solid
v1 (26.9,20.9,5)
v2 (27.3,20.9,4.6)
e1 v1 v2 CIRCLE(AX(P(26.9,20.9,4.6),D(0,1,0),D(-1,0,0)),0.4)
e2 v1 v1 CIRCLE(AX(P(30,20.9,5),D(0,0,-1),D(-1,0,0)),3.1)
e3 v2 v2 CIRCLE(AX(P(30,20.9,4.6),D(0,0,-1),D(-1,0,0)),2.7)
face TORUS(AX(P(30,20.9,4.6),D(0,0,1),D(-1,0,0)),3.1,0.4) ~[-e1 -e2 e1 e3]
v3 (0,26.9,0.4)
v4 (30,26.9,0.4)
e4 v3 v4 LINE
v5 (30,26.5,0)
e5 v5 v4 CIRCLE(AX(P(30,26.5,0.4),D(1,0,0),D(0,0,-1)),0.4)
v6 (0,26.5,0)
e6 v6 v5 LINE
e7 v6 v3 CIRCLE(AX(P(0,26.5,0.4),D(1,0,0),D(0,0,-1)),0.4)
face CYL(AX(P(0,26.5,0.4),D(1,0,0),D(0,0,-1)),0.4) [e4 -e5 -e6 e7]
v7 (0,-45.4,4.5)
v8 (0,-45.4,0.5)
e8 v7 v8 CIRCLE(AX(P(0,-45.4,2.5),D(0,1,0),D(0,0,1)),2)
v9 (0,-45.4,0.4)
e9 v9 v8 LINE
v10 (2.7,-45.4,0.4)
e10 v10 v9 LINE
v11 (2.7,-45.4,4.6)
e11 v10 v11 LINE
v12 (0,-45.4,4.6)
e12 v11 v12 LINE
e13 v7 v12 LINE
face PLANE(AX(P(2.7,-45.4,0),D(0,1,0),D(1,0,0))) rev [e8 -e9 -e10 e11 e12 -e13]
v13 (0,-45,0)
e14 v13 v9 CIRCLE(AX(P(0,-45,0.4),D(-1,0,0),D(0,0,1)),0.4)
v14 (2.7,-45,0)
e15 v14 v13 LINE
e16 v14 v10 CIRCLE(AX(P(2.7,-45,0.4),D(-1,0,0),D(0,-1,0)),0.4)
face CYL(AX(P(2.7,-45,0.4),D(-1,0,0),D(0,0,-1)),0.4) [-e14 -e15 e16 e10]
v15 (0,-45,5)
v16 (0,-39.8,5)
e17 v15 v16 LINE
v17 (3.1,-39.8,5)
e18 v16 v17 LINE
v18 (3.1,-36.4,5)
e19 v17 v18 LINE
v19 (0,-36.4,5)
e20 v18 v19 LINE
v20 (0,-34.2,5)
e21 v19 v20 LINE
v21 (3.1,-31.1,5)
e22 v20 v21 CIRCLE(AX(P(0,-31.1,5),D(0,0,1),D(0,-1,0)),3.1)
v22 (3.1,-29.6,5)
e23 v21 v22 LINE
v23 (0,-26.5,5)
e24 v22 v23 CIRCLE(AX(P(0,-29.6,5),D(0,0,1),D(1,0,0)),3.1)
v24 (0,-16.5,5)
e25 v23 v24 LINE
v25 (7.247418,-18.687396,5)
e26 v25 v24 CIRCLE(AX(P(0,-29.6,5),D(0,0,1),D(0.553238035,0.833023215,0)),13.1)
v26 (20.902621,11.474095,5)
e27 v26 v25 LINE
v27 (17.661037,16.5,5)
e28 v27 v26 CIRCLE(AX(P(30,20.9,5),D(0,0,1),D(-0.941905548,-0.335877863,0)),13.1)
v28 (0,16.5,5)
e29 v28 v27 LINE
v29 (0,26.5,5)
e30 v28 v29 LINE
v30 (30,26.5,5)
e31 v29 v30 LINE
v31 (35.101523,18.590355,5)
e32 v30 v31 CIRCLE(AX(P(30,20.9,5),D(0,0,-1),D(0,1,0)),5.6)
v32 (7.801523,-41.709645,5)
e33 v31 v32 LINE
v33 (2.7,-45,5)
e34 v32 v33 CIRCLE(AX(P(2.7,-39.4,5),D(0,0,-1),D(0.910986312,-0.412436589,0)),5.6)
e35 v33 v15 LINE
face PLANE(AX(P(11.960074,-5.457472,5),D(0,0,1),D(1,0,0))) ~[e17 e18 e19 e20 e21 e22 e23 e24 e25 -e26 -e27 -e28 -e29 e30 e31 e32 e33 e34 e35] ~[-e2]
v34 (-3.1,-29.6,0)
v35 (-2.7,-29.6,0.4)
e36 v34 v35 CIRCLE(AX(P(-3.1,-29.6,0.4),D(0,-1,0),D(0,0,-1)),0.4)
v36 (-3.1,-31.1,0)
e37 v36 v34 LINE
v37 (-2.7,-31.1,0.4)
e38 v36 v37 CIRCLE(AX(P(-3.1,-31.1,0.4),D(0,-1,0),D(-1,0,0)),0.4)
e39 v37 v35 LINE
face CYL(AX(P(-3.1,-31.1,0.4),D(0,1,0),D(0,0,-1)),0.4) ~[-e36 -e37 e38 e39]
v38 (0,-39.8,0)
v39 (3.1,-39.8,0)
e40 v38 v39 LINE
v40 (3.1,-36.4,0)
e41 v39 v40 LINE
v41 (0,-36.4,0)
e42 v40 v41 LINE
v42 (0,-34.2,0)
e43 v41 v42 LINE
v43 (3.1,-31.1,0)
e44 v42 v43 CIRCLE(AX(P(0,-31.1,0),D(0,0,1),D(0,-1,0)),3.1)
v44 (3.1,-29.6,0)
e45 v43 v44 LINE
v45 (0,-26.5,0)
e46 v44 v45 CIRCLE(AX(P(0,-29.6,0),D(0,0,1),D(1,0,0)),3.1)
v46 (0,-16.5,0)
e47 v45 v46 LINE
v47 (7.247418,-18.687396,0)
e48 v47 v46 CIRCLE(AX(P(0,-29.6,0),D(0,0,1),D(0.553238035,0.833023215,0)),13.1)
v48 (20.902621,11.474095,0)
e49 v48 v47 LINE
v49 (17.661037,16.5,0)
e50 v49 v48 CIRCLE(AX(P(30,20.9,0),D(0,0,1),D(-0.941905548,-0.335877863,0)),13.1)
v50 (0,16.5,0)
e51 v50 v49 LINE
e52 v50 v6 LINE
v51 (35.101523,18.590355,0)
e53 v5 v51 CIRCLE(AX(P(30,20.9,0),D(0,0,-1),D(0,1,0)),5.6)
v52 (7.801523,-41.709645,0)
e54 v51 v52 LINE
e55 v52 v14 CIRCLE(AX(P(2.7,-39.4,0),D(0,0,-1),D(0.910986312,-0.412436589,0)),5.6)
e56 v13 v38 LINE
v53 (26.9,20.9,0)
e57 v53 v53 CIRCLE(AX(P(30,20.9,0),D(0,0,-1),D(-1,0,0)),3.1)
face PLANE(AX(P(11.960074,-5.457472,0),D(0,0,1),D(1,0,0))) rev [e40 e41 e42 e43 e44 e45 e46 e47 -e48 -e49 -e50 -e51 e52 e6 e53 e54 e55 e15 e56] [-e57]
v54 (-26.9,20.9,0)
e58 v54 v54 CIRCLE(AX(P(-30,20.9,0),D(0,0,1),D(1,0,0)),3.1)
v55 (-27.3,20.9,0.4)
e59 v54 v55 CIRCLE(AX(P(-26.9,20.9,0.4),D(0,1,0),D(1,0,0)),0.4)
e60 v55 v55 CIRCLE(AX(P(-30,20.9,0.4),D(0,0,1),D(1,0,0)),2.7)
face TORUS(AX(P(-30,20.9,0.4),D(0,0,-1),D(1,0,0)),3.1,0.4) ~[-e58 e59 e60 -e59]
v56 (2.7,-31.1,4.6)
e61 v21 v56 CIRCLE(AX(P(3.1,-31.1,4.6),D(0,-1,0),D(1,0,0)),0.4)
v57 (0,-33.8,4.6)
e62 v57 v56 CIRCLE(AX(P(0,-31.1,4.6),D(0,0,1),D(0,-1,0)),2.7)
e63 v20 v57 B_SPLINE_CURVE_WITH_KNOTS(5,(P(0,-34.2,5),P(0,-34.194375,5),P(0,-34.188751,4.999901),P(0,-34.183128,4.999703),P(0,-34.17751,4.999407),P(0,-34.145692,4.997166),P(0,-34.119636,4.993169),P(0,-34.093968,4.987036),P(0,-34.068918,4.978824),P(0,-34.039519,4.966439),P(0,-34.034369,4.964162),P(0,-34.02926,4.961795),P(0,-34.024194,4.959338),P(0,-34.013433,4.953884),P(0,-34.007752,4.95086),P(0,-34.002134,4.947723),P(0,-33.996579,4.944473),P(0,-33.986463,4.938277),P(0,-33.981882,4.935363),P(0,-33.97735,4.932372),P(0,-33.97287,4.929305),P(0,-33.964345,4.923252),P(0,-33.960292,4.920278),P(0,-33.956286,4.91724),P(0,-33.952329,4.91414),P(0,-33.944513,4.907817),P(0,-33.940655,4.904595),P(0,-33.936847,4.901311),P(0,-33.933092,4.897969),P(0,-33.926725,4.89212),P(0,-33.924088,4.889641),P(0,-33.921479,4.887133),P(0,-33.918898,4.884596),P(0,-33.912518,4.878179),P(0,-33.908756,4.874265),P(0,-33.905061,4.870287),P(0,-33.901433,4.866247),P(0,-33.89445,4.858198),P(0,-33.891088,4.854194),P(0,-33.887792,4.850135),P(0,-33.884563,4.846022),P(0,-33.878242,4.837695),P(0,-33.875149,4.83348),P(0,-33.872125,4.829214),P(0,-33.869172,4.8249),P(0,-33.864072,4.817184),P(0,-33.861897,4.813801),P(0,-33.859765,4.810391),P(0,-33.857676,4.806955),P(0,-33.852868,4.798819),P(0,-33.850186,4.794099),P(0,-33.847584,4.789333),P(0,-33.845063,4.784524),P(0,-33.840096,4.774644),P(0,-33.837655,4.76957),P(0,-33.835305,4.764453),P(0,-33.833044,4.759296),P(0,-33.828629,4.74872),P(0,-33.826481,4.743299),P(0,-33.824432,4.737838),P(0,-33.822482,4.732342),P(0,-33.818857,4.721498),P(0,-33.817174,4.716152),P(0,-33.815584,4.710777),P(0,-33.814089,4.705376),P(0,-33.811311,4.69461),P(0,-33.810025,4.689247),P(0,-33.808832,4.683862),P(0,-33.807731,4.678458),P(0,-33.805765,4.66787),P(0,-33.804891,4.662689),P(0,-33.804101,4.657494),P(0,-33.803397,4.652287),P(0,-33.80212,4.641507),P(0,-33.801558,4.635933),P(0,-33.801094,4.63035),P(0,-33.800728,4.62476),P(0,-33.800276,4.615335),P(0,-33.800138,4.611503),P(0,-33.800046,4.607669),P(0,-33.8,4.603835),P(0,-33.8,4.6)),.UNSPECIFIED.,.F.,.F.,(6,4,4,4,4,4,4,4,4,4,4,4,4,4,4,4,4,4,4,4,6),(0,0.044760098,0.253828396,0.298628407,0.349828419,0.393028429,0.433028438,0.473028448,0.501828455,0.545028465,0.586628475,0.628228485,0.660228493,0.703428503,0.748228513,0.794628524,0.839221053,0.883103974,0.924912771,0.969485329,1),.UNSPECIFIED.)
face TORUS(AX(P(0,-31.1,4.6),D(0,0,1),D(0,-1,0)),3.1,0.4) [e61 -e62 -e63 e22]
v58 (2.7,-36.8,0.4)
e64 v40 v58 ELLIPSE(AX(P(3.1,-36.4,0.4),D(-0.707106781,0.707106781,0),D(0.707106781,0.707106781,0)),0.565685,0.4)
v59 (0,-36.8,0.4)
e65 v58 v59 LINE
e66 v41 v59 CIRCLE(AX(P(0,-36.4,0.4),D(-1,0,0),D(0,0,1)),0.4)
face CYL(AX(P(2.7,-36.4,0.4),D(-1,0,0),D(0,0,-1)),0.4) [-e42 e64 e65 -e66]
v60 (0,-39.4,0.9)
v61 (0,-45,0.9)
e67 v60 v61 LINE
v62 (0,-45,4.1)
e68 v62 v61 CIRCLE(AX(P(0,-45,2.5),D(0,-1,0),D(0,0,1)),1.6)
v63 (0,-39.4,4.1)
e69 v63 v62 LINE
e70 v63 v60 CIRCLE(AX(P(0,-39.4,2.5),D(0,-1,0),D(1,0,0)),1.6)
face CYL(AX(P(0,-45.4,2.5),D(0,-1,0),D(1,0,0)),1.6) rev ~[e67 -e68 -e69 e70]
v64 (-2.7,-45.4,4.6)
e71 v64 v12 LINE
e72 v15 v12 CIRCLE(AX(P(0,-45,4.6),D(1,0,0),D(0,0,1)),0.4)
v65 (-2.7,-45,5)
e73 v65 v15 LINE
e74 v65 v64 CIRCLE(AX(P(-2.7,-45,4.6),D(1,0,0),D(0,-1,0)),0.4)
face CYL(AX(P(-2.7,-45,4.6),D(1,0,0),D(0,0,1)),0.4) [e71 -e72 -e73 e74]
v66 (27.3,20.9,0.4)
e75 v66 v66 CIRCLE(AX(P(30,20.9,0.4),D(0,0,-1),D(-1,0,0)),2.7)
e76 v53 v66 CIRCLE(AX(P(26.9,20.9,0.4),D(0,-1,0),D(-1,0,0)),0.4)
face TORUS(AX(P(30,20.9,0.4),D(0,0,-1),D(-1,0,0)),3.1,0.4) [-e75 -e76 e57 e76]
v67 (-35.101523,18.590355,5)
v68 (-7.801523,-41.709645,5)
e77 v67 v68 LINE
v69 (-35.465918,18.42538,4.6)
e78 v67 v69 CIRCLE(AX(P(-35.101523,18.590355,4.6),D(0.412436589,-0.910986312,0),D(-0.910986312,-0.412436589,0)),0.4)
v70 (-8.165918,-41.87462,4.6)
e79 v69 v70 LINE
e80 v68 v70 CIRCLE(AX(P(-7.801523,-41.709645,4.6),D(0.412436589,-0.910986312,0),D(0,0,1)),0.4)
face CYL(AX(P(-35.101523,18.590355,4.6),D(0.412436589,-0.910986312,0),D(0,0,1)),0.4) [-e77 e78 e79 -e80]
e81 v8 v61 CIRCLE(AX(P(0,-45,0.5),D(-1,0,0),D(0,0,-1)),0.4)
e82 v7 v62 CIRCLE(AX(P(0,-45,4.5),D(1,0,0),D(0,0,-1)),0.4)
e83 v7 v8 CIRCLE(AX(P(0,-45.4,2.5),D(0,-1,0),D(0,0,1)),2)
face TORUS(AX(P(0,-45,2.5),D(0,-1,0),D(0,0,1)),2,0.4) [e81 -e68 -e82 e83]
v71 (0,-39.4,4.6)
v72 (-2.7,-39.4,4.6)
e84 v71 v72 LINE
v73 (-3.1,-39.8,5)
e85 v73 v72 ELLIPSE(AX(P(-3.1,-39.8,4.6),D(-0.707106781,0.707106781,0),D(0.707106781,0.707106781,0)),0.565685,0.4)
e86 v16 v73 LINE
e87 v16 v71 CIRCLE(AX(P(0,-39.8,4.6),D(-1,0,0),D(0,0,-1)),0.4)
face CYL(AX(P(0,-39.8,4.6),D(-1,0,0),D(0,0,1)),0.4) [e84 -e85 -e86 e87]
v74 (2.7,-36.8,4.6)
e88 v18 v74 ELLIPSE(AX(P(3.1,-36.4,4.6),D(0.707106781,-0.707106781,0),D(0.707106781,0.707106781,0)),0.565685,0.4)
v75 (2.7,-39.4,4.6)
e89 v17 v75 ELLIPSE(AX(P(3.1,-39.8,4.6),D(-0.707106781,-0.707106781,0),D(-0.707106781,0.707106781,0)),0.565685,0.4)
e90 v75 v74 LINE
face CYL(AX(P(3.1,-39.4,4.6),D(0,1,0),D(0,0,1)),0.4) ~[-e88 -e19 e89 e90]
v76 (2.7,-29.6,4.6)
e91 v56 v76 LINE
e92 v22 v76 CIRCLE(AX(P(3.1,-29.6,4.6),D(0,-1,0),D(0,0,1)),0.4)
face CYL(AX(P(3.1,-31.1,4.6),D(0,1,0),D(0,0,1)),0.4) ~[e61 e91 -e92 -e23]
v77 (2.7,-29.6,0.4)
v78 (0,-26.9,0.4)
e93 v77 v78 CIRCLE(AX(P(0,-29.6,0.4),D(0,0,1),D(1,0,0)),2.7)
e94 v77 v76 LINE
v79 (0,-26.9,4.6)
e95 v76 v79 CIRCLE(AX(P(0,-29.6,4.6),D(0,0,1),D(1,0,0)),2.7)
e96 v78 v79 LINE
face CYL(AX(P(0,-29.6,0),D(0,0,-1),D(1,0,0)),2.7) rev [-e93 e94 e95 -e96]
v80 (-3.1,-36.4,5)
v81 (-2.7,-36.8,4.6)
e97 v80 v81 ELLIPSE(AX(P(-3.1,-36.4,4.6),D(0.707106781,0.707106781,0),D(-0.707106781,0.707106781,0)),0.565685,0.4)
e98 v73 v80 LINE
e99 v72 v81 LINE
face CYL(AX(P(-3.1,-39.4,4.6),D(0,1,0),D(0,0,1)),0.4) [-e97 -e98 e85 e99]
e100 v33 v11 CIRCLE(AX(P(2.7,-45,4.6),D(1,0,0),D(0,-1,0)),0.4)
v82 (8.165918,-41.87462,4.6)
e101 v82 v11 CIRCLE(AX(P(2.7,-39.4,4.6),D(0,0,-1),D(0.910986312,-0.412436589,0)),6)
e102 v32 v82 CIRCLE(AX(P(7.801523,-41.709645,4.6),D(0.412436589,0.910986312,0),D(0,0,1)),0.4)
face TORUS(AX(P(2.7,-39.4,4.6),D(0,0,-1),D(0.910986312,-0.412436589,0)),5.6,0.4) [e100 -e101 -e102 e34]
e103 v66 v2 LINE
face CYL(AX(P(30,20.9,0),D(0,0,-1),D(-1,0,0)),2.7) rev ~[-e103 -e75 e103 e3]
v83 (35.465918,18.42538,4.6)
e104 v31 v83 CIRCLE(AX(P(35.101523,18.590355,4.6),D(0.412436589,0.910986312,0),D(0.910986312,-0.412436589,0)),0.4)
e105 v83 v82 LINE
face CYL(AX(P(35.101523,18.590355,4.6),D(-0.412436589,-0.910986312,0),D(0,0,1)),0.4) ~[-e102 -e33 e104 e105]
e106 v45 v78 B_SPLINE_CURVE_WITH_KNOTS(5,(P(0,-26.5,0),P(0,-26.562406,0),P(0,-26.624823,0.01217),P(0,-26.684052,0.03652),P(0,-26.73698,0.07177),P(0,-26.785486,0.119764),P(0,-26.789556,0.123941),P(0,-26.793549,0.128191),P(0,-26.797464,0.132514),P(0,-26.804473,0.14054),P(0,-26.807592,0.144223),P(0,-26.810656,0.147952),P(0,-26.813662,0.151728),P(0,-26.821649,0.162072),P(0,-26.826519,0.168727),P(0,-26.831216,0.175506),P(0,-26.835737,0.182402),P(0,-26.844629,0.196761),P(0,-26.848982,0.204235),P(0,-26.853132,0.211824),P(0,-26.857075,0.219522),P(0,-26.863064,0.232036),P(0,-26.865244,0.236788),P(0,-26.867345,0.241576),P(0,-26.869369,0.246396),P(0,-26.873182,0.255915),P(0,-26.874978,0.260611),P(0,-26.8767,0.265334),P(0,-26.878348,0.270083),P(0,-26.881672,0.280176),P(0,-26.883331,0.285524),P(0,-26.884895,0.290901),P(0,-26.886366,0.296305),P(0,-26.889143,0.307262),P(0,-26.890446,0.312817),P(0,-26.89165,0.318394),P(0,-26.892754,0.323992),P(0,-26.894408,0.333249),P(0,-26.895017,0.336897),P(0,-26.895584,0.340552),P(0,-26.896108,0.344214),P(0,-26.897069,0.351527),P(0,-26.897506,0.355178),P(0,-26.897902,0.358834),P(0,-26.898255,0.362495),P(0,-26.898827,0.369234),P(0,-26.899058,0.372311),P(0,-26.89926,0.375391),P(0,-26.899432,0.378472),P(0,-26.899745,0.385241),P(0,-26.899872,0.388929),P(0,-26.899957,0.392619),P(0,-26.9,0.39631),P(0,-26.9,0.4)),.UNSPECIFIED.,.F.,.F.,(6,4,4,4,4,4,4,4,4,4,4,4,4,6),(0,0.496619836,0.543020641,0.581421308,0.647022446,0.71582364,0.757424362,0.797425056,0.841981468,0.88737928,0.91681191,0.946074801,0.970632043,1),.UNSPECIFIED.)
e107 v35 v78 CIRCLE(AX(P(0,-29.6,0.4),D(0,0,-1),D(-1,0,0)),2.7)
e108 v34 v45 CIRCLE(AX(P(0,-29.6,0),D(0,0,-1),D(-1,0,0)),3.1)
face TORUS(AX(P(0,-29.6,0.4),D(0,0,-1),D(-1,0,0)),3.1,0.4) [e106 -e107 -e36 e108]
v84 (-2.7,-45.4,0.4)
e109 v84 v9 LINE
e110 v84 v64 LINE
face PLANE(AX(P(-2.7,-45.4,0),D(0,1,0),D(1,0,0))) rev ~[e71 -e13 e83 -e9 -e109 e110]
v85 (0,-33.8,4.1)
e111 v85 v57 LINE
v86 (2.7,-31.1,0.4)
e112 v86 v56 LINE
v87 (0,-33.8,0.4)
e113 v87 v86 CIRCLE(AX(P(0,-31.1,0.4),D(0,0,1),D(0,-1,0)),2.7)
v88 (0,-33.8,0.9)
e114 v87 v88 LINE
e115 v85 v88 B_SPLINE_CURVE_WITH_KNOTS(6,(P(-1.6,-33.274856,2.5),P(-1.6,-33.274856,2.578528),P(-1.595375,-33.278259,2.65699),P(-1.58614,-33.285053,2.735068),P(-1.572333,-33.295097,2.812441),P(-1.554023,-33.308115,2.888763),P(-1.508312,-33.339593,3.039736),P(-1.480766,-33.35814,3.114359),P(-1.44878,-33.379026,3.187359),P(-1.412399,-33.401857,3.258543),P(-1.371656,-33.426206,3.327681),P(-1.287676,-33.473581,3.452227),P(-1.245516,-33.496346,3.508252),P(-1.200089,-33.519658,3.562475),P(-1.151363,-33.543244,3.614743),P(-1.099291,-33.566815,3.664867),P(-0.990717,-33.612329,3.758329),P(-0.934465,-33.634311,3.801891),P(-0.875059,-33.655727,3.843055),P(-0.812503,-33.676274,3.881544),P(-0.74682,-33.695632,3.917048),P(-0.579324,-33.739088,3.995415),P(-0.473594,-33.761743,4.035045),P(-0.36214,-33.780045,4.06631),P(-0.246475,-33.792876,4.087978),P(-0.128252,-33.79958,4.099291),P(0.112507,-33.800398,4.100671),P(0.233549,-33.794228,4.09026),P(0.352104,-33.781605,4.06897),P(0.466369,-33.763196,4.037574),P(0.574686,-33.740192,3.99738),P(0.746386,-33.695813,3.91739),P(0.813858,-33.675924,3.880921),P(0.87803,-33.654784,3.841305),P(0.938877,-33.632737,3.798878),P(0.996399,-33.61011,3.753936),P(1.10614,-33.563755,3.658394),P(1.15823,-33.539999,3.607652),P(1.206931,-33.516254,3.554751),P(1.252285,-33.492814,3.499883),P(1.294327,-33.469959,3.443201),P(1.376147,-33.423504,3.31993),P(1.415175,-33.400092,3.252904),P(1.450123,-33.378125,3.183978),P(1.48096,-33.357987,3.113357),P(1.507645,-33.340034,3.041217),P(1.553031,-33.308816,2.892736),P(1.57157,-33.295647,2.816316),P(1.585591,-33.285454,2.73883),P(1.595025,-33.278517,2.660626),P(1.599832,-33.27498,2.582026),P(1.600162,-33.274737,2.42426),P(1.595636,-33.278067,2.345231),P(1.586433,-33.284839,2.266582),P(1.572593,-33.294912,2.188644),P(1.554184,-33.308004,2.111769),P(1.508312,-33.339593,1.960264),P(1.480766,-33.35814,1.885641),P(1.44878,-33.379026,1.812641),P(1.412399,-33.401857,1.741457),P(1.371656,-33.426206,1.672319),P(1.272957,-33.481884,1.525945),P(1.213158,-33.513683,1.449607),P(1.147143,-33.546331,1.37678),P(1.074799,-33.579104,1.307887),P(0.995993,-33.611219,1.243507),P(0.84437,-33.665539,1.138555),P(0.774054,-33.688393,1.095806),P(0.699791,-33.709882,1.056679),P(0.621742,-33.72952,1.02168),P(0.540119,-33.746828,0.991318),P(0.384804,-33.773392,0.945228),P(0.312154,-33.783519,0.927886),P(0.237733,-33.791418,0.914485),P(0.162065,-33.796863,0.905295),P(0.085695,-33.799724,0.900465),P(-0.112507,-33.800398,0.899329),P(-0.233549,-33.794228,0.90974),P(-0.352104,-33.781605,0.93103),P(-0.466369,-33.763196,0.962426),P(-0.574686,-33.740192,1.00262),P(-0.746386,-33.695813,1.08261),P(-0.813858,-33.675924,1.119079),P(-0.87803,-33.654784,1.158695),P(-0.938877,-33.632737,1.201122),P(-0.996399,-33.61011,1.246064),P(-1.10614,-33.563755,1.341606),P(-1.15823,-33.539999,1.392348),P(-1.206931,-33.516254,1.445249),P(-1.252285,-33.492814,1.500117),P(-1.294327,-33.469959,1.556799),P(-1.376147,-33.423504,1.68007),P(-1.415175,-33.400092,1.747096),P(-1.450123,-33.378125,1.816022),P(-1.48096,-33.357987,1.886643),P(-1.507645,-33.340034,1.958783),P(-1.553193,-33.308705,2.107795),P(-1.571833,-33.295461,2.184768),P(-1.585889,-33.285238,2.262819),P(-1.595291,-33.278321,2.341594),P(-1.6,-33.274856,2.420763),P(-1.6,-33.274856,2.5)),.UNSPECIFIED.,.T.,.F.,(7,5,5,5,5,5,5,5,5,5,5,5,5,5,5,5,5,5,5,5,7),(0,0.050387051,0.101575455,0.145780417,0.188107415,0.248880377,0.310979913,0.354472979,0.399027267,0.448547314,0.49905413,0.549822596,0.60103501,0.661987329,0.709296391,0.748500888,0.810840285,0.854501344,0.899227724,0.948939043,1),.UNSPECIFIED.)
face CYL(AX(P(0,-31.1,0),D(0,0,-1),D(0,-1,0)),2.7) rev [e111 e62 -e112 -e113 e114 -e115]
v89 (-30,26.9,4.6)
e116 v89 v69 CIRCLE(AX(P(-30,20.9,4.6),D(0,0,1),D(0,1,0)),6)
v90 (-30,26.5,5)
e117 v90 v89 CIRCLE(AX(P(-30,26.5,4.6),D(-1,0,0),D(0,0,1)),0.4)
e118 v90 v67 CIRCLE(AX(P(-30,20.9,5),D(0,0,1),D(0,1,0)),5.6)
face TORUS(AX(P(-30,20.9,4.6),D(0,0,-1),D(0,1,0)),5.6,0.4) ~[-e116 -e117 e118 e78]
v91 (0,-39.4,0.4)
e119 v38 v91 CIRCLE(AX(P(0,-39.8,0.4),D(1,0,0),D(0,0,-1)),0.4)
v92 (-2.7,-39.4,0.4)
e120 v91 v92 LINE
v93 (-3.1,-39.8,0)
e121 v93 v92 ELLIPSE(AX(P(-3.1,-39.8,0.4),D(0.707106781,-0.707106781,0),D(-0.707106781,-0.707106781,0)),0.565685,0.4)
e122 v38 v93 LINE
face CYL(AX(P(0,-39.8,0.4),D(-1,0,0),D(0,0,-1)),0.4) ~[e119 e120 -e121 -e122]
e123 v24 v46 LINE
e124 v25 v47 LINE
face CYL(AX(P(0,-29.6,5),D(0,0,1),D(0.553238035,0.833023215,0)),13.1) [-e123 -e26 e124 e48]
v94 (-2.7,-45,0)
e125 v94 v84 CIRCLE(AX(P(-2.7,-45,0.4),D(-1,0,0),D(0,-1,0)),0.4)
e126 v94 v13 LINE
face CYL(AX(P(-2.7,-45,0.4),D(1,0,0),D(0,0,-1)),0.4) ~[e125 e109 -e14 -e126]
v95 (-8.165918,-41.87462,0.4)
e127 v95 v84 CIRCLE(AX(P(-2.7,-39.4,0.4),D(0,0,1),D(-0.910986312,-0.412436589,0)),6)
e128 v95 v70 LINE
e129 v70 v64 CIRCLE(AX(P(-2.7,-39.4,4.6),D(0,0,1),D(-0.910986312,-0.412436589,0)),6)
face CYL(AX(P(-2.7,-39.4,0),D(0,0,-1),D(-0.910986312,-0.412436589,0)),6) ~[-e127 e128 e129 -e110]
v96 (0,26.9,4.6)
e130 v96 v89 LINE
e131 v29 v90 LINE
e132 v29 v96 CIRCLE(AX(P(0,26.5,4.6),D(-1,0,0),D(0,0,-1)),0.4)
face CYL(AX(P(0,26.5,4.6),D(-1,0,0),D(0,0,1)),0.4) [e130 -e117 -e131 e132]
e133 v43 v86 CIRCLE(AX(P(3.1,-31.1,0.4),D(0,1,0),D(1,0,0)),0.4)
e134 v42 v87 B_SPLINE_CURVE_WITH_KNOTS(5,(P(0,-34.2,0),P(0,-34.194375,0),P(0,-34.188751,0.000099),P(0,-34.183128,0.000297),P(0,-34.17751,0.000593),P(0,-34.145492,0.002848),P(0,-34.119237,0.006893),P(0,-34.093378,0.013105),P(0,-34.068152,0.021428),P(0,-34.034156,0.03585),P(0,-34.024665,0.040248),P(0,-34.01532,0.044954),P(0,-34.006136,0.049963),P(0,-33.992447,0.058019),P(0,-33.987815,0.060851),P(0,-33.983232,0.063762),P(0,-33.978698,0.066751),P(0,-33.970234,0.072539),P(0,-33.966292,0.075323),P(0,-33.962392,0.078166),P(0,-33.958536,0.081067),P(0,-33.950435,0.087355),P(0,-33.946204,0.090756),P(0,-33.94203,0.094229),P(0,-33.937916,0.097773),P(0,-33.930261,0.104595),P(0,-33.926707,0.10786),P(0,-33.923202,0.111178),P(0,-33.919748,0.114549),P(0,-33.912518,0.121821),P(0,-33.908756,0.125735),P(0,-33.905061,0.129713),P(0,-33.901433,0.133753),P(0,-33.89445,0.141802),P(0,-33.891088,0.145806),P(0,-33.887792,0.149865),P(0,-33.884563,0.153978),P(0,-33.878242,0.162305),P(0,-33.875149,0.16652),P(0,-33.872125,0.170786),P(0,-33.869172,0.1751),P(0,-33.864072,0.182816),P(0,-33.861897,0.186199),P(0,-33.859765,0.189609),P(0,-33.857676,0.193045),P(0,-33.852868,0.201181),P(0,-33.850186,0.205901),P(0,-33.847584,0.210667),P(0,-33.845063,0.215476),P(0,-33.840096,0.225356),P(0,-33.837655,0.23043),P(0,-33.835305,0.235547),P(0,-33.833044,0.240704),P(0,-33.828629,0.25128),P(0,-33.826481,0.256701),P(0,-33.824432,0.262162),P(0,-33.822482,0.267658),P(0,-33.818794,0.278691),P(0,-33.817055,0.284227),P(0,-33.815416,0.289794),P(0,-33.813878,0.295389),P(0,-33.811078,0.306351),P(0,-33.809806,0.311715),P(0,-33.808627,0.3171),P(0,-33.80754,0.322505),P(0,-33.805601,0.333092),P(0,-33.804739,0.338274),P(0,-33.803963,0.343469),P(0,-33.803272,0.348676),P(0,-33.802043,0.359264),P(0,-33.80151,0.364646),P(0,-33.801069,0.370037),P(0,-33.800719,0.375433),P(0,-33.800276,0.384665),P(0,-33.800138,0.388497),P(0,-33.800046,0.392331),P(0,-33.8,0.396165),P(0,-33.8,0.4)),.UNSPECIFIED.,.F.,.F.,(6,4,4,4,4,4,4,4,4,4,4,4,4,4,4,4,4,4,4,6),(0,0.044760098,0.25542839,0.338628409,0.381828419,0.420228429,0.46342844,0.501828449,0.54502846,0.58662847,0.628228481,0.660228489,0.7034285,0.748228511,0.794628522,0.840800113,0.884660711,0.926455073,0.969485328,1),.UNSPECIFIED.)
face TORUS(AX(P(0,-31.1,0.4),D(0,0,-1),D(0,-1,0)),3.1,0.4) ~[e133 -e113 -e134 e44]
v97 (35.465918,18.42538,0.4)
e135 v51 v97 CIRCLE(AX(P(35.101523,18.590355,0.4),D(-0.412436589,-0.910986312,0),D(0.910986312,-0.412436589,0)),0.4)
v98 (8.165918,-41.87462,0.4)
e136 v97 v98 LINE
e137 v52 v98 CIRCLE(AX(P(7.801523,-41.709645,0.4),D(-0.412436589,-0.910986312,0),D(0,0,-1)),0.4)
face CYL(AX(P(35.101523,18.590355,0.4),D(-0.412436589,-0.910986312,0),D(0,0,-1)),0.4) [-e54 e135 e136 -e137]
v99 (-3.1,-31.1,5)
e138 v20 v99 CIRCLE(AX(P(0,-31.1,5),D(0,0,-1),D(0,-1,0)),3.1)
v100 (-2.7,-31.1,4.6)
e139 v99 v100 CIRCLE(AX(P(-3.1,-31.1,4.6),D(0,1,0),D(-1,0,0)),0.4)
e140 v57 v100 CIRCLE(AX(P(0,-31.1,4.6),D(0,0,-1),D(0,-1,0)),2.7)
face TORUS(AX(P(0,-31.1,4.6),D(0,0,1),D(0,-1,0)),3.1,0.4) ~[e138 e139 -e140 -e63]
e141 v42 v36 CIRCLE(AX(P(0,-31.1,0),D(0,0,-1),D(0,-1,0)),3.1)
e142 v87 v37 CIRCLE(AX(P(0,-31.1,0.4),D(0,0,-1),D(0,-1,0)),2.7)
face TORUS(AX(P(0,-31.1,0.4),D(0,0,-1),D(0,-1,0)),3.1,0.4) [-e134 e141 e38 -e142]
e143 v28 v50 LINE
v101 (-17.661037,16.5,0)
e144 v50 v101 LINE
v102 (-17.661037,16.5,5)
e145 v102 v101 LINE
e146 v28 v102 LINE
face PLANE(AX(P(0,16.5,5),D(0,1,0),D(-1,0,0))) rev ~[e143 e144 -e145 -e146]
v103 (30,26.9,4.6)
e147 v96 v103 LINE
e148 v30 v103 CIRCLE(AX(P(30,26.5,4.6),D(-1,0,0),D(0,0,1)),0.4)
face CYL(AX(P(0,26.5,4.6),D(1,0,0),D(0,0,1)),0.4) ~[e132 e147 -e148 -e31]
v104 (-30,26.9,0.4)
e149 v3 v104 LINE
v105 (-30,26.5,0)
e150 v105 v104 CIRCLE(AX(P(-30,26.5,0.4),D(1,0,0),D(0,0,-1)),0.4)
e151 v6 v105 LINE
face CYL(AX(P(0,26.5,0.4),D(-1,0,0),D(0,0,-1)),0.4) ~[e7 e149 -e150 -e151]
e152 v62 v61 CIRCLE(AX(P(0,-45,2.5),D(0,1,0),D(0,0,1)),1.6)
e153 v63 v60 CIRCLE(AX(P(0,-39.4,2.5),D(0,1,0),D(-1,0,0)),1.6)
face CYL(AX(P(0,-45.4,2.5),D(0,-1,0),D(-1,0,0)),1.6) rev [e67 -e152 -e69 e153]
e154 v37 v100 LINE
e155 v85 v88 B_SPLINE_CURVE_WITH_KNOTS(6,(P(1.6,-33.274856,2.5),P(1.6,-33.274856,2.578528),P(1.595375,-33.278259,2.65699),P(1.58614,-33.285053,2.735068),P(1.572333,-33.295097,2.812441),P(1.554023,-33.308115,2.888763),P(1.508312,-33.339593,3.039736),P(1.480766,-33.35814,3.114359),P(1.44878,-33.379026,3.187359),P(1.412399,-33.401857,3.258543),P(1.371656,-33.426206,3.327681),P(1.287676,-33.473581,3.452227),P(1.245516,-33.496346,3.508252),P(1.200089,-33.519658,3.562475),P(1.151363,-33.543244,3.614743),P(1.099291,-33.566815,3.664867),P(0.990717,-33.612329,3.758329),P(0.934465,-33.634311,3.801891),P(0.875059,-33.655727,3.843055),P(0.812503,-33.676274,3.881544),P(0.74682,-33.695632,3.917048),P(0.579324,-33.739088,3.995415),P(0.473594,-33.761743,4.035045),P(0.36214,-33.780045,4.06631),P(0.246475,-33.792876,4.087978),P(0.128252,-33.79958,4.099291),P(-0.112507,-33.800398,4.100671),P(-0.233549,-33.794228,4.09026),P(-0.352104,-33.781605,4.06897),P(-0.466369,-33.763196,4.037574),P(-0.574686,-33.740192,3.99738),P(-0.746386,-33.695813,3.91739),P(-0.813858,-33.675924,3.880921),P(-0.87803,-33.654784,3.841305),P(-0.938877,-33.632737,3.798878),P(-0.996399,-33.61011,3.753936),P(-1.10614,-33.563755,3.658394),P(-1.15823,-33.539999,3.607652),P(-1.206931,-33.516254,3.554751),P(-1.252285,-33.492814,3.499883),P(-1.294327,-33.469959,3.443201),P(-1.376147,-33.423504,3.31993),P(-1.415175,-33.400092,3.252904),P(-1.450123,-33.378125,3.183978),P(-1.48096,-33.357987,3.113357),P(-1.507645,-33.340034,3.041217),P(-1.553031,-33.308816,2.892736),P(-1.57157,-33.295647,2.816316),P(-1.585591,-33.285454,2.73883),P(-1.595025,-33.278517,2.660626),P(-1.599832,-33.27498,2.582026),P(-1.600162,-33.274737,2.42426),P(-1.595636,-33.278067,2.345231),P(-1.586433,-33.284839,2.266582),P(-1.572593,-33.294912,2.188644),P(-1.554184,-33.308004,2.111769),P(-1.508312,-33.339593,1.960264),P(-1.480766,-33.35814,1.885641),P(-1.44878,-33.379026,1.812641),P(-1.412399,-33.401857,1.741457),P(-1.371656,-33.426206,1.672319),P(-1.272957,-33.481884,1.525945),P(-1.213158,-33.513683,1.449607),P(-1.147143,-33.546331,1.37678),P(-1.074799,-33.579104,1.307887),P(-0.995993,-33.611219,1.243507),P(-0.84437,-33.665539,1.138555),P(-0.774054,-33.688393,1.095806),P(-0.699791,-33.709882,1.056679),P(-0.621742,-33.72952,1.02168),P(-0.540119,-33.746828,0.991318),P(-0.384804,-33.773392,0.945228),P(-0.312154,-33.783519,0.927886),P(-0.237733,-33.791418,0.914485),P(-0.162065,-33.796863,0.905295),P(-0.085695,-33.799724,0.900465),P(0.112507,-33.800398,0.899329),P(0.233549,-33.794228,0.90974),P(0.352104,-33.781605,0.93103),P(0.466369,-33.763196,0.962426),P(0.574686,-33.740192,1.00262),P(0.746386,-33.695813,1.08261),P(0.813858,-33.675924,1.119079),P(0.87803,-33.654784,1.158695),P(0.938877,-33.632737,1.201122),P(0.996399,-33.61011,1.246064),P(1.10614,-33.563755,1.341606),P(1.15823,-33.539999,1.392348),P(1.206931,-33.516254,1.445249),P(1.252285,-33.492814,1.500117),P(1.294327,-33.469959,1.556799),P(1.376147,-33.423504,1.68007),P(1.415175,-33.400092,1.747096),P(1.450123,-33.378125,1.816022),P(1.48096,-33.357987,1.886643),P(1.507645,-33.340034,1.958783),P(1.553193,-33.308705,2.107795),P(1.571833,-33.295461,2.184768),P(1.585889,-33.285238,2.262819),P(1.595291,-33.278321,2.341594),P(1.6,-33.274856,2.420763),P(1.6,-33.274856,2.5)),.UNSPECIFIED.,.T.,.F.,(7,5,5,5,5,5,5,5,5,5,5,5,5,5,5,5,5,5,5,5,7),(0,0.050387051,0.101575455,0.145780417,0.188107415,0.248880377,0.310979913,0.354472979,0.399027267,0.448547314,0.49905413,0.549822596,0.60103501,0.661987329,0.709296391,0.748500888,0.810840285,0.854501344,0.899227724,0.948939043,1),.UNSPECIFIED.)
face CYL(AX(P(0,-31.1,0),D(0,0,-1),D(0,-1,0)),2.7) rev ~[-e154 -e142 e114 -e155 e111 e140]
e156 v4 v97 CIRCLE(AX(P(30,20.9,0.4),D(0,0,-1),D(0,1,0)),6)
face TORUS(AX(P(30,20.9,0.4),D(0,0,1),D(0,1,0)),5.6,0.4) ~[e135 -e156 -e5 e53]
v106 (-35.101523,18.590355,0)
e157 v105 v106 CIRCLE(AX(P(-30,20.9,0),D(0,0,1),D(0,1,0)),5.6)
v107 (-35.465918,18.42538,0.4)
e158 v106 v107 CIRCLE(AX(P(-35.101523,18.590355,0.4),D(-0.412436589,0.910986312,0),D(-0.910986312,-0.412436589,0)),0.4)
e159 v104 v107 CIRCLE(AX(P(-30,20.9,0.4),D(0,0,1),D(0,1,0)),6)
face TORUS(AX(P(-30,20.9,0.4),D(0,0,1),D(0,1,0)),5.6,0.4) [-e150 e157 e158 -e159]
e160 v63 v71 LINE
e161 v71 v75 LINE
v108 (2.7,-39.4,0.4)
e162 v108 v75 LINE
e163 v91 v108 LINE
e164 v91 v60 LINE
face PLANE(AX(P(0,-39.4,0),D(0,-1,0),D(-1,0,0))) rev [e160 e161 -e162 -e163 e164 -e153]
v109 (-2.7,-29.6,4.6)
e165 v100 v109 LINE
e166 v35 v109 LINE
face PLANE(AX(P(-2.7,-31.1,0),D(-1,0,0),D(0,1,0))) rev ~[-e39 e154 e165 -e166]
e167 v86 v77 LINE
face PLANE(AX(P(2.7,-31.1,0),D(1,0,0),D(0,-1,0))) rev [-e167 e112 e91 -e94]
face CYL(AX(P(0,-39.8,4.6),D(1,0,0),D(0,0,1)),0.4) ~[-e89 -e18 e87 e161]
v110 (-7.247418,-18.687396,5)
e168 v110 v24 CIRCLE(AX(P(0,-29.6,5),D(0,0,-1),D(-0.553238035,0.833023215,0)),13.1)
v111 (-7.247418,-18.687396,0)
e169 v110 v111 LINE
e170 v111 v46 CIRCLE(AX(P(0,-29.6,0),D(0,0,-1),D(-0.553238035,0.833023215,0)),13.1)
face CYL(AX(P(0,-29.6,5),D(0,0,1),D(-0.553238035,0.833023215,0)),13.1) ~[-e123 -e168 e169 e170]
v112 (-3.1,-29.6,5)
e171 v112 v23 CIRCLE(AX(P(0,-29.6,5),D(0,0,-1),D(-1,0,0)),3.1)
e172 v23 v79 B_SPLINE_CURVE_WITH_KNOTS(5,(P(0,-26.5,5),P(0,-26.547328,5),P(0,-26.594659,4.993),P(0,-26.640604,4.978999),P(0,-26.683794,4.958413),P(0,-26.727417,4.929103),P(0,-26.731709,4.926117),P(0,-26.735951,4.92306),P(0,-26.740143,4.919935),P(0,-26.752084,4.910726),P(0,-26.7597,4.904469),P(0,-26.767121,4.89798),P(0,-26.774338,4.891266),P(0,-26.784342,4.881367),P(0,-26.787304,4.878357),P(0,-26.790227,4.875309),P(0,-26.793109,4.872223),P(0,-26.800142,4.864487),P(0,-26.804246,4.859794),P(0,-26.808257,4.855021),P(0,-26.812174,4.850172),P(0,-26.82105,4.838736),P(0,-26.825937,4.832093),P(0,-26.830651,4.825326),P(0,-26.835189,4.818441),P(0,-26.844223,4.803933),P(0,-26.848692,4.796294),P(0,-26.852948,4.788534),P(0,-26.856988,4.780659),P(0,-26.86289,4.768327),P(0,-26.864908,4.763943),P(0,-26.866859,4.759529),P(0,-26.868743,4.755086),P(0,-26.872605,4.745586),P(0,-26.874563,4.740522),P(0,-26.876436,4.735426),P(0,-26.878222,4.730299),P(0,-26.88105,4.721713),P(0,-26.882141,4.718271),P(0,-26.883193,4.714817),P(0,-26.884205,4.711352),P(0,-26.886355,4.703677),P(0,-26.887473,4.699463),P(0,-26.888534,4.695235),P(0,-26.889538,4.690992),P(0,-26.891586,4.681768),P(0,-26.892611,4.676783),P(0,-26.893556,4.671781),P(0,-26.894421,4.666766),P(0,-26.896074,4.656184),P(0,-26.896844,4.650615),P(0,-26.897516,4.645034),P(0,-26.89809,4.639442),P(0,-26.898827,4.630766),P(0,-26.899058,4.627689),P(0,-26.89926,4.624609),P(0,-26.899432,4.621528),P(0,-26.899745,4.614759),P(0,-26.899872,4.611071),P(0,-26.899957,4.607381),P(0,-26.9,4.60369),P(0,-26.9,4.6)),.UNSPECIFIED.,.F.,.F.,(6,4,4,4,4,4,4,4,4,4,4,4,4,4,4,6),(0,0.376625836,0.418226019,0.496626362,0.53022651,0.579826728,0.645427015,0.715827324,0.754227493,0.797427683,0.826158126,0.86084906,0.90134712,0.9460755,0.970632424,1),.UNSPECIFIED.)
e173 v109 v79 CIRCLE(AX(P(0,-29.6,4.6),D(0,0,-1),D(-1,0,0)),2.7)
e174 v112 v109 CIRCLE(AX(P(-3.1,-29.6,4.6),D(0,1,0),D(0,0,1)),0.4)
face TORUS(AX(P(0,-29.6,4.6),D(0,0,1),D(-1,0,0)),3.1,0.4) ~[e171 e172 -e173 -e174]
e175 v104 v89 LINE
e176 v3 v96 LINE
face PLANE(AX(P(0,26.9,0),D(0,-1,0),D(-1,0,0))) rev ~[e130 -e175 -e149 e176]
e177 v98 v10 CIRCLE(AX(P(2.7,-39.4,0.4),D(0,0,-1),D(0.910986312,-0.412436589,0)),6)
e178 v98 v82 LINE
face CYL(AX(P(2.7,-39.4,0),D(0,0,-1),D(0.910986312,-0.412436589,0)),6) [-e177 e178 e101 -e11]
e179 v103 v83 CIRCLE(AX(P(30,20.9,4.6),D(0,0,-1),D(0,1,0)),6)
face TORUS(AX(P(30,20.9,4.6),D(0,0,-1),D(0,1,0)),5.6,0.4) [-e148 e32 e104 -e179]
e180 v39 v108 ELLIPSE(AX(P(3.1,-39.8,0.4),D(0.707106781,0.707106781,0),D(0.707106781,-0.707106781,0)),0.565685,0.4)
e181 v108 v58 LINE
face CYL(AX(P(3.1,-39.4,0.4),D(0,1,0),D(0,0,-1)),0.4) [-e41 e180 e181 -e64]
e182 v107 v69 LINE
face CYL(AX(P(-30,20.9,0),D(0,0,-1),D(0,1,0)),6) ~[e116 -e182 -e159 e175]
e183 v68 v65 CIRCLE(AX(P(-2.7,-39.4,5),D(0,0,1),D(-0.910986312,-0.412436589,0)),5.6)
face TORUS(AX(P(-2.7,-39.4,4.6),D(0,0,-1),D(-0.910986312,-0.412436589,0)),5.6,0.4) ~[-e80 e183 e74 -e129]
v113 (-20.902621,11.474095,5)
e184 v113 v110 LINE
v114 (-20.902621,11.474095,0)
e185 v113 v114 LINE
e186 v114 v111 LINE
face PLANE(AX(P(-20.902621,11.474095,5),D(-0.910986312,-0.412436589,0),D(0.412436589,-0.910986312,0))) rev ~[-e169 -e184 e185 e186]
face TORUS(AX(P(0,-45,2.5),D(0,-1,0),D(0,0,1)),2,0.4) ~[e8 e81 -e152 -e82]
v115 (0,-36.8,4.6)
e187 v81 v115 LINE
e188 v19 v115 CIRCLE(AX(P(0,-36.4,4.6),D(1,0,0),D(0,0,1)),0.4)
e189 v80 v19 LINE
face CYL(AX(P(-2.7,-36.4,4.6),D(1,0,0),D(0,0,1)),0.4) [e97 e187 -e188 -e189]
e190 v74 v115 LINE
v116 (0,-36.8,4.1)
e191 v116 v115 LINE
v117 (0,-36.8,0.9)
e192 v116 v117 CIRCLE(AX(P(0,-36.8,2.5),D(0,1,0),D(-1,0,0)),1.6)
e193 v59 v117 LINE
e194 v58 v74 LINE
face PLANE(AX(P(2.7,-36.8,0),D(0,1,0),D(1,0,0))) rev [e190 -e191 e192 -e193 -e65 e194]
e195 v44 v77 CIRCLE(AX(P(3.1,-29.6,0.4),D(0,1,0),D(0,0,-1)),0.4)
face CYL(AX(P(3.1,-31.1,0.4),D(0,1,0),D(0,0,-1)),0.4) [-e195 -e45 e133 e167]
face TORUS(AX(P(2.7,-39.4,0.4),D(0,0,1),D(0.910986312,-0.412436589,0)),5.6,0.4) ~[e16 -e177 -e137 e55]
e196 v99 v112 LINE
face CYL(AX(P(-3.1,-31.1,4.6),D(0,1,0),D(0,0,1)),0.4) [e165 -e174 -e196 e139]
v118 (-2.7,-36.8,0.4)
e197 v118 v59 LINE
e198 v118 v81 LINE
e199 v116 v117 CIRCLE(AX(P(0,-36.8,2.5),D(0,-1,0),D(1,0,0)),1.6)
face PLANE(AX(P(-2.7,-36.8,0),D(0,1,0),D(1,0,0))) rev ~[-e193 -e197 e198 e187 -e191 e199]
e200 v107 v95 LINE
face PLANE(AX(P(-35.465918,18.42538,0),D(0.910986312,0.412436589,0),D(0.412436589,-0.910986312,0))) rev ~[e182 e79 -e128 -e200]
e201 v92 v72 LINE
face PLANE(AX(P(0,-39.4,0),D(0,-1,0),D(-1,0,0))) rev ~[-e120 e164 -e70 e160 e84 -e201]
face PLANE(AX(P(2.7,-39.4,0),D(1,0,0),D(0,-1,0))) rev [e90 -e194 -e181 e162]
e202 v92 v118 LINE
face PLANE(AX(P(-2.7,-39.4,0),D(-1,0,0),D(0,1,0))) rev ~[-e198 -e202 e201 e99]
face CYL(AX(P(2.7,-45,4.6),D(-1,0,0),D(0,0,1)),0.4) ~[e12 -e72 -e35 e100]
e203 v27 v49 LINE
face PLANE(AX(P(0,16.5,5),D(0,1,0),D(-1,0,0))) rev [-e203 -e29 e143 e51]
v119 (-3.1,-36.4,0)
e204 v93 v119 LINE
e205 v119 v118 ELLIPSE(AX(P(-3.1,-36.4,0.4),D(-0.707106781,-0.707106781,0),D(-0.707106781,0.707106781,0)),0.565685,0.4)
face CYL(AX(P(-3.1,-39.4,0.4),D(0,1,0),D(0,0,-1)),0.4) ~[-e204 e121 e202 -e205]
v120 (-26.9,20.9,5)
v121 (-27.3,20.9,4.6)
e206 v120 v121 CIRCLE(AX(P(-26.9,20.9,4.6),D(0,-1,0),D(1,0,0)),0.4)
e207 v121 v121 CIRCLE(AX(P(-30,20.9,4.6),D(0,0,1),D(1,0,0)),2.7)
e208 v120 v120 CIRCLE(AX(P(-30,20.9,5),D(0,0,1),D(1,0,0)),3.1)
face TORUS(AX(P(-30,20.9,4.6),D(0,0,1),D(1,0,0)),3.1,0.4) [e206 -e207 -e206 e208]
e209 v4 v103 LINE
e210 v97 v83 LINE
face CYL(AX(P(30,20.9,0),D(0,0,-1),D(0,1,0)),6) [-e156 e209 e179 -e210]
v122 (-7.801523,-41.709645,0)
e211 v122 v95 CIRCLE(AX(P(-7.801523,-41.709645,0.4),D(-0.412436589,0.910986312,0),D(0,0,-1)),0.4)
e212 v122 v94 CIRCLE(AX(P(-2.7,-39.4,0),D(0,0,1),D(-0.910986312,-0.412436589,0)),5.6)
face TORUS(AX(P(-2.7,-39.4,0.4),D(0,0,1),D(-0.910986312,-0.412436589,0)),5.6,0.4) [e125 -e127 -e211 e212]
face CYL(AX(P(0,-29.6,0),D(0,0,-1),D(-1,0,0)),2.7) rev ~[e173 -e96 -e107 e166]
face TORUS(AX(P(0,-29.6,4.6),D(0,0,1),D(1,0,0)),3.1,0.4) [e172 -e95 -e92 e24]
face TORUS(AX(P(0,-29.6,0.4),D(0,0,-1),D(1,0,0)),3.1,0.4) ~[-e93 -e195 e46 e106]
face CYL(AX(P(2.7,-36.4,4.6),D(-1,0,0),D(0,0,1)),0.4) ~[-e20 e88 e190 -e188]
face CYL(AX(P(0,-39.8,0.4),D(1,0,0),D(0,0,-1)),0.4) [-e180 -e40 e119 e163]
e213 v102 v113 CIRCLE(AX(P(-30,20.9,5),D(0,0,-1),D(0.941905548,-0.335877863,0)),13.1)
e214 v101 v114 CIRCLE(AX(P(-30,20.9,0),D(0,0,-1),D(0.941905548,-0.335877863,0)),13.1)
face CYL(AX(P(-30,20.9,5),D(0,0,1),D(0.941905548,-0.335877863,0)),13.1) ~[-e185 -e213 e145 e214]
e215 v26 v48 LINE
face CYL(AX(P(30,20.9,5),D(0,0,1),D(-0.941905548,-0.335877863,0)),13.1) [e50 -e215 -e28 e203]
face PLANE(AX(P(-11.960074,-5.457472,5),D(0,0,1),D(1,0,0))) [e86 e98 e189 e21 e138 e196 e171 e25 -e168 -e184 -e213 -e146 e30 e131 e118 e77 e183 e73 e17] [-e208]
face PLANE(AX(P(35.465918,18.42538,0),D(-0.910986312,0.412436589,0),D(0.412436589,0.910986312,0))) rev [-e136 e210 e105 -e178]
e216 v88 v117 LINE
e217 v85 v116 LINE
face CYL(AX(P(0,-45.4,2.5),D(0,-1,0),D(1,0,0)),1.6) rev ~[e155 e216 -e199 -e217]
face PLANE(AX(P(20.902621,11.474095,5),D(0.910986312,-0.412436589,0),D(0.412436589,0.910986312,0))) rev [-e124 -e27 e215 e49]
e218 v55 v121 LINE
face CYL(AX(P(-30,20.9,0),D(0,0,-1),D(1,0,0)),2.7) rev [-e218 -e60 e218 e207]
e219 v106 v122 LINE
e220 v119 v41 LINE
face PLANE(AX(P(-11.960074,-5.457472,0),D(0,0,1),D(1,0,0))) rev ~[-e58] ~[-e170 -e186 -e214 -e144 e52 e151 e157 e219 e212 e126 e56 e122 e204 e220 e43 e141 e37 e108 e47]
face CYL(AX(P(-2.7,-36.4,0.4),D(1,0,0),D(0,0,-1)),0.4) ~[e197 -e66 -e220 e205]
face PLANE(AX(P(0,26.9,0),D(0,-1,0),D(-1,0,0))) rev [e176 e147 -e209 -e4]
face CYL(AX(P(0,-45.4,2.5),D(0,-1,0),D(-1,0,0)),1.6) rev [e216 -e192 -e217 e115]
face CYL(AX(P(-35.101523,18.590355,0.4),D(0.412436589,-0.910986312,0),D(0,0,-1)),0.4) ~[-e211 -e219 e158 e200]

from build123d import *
from build123d import SkipClean  # not in build123d's __all__

# Parameters (mm, degrees)
F0_R          = 2.7
F1_DEPTH      = 5
F3_DEPTH      = 5
F5_END_RADIUS = 2.7
F4_R          = 1.6
F5_REACH      = 76.8264833996
F6_R          = 0.4


with BuildPart() as f1:
    # F0 (on Top) → F1 (new body)
    with BuildSketch(Plane.XY):
        with BuildLine():
            Line((0, -26.9), (0, 26.9))
            Line((0, 26.9), (-30, 26.9))
            ThreePointArc((-30, 26.9), (-35.0422077109, 24.1520979998), (-35.4659178703, 18.4253804667))
            Line((-35.4659178703, 18.4253804667), (-8.1659178703, -41.8746195333))
            ThreePointArc((-8.1659178703, -41.8746195333), (-5.9520979998, -44.4422077109), (-2.7, -45.4))
            Line((-2.7, -45.4), (0, -45.4))
            Line((0, -45.4), (0, -39.4))
            Line((0, -39.4), (-2.7, -39.4))
            Line((-2.7, -39.4), (-2.7, -36.8))
            Line((-2.7, -36.8), (0, -36.8))
            Line((0, -36.8), (0, -33.8))
            ThreePointArc((0, -33.8), (-1.9091883092, -33.0091883092), (-2.7, -31.1))
            Line((-2.7, -31.1), (-2.7, -29.6))
            ThreePointArc((-2.7, -29.6), (-1.9091883092, -27.6908116908), (0, -26.9))
        make_face()
        with Locations((-30, 20.9)):
            Circle(F0_R, mode=Mode.SUBTRACT)
    extrude(amount=F1_DEPTH)

    # F2 (on face) → F3 (cut, through all)
    with BuildSketch(Plane.XY.offset(5)):
        with BuildLine():
            Line((0, -16.5), (0, 16.5))
            Line((0, 16.5), (-17.6610373207, 16.5))
            ThreePointArc((-17.6610373207, 16.5), (-18.9911798312, 13.7995860339), (-20.9026205506, 11.4740948895))
            Line((-20.9026205506, 11.4740948895), (-7.2474182596, -18.687395885))
            ThreePointArc((-7.2474182596, -18.687395885), (-3.7851609011, -17.0587657325), (0, -16.5))
        make_face()
    extrude(amount=-F3_DEPTH, mode=Mode.SUBTRACT)

    f5_end = (Plane(origin=(0, -31.1, 2.5), x_dir=(-1, 0, 0), z_dir=(0, 0, -1)) * Cylinder(F5_END_RADIUS, 315.4959771518, mode=Mode.PRIVATE)).faces().sort_by_distance((-1.9091883092, -33.0091883092, 2.5))[0]
    # F4 (on face) → F5 (cut, up to the whole of a round face its end follows)
    with BuildSketch(Plane.XZ.offset(45.4)):
        with Locations((0, 2.5)):
            Circle(F4_R)
    f5_long = extrude(amount=-F5_REACH, mode=Mode.PRIVATE)
    add(split(f5_long, bisect_by=f5_end, keep=Keep.ALL, mode=Mode.PRIVATE).solids().sort_by_distance((0, -45.4, 2.5))[0], mode=Mode.SUBTRACT)

    # F6
    f6_edges = [f1.edges().sort_by_distance(p)[0] for p in [
        (-21.815918, -11.72462, 5),
        (-5.952098, -44.442208, 0),
        (-1.6, -45.4, 2.5),
        (-2.7, -38.1, 5),
        (-1.35, -39.4, 5),
        (-1.35, -36.8, 5),
        (-1.35, -39.4, 0),
        (-2.7, -38.1, 0),
        (-1.35, -36.8, 0),
        (-32.7, 20.9, 5),
        (-32.7, 20.9, 0),
        (-1.909188, -33.009188, 0),
        (-2.7, -30.35, 5),
    ]]
    fillet(f6_edges, radius=F6_R)

    # F7: F1 across face


with BuildPart() as f1_1:
    add(f1.part, clean=False)
    with SkipClean():  # cleaning this boolean's faces spoils the solid; the shape is the same uncleaned
        add(f1.part.mirror(Plane(origin=(0, 21.6932418104, 2.5), x_dir=(0, 1, 0), z_dir=(1, 0, 0))), clean=False)


solid = f1_1.part
